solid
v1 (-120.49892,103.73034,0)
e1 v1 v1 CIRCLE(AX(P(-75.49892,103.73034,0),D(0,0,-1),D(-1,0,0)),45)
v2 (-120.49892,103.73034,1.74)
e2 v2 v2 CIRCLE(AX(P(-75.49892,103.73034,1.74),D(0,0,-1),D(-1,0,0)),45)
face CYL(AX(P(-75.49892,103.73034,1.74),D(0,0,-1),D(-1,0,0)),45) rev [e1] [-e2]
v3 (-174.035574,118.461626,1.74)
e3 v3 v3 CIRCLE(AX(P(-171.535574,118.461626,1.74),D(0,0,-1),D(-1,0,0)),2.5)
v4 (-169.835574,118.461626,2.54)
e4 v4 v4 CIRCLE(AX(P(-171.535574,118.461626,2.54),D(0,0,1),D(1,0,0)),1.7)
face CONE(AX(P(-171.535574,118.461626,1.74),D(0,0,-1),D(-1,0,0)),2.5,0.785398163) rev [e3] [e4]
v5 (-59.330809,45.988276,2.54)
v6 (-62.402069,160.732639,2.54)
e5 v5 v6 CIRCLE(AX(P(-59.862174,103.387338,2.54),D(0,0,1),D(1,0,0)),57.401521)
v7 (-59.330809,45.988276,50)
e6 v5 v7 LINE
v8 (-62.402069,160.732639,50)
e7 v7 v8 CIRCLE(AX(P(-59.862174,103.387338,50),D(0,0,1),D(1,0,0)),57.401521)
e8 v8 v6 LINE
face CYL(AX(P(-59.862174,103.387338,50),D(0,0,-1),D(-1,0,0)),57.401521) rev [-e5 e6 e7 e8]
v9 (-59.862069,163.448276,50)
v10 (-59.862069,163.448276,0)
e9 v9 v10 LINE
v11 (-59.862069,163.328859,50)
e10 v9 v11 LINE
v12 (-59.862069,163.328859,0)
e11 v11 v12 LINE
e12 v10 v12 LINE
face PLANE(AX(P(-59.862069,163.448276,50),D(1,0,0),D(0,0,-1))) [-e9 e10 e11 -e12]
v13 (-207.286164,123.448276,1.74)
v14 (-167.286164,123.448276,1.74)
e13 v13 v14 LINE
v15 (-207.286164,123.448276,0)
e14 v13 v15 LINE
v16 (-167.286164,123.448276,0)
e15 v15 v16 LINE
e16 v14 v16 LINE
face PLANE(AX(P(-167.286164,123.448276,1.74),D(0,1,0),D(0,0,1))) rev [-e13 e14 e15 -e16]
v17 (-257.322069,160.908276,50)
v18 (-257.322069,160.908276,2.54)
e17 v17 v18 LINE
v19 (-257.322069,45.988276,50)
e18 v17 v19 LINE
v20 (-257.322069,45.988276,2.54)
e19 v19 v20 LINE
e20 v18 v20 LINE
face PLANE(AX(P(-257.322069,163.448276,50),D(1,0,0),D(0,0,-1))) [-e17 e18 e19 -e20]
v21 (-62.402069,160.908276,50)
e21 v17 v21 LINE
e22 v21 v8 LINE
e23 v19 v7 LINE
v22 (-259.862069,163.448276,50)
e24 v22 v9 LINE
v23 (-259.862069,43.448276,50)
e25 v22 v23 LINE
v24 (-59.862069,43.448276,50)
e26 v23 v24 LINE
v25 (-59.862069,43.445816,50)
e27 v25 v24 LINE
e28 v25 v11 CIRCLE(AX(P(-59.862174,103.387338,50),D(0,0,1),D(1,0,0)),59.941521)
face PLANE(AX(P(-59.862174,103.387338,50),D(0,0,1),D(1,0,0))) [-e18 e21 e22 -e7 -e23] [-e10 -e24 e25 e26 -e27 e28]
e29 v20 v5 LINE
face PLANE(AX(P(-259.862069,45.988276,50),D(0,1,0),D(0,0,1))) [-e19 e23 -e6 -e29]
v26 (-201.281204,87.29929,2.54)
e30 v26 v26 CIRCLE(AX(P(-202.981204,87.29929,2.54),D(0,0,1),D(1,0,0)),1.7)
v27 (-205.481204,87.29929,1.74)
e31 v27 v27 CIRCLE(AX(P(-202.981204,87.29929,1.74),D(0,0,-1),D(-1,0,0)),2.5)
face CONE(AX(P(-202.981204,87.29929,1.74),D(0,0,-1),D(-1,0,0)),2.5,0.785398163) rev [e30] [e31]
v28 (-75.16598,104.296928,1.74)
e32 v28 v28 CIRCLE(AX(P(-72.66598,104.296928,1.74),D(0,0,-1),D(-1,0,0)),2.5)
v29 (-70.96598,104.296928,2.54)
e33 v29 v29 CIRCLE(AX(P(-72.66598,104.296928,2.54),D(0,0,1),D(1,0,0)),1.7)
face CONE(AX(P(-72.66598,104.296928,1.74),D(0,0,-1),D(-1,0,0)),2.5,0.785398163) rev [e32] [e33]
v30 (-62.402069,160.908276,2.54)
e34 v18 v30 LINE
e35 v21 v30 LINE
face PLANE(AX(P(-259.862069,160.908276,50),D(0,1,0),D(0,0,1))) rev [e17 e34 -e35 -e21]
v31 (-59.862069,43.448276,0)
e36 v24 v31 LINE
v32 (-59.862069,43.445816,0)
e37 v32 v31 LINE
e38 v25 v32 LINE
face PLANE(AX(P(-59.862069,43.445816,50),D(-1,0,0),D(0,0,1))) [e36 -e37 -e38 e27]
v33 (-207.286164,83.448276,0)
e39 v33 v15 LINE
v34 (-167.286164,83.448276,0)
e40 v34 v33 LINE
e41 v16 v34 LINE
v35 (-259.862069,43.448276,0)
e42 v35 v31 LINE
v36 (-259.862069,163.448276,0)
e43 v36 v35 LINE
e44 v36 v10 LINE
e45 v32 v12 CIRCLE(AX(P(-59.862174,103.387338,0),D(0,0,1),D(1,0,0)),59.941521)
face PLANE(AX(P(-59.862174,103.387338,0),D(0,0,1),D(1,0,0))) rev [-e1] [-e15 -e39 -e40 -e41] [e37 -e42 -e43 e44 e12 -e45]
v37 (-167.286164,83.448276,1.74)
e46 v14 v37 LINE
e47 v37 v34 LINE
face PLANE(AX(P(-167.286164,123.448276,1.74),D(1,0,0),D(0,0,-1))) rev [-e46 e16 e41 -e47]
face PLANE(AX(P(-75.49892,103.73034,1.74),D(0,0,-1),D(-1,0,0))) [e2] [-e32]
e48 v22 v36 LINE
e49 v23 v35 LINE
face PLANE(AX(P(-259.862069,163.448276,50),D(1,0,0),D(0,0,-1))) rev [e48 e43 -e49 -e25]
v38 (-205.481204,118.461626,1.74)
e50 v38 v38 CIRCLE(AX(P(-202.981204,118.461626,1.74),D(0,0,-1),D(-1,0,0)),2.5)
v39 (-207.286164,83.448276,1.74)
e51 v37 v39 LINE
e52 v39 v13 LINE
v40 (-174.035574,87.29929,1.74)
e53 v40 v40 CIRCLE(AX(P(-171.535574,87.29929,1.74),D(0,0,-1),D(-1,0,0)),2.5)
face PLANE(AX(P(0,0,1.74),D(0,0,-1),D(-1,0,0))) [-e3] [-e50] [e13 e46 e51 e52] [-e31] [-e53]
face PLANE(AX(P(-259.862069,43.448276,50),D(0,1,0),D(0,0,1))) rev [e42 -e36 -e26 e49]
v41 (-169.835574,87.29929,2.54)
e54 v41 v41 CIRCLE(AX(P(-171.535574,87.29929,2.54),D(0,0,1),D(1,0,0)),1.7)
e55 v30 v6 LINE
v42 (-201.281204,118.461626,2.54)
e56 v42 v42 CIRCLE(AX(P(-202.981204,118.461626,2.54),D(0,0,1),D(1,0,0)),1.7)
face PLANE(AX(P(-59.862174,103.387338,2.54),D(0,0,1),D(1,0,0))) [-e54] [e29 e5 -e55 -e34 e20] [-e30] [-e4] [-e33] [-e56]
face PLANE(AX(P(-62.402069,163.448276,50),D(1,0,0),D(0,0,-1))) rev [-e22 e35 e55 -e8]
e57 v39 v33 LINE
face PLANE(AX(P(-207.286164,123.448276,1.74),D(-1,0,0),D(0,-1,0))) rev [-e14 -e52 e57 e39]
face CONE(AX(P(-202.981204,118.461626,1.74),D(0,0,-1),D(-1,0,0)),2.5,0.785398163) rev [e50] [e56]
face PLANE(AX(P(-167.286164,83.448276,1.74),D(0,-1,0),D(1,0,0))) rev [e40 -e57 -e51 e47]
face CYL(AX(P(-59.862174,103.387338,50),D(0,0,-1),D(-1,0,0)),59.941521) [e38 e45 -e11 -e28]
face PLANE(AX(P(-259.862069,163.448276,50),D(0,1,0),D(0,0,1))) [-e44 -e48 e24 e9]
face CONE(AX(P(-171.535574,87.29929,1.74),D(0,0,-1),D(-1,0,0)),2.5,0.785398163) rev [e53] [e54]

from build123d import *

# Parameters (mm, degrees)
BOSS_EXTRUDE1_DEPTH            = 50
SHELL1_START                   = 2.54
SHELL1_DEPTH                   = 47.46
SKETCH3_R                      = 45
CUT_EXTRUDE1_DEPTH             = 1.74
SKETCH4_W                      = 40
SKETCH4_H                      = 40
CUT_EXTRUDE2_DEPTH             = 1.74
F_1_0MM_DOWEL_HOLE1_AT_2_COUNT = 2
F_1_0MM_DOWEL_HOLE1_AT_2_PITCH = 99.87910309
F_1_0MM_DOWEL_HOLE1_AT_3_COUNT = 2
F_1_0MM_DOWEL_HOLE1_AT_3_PITCH = 131.082783866
F_1_0MM_DOWEL_HOLE1_AT_4_COUNT = 2
F_1_0MM_DOWEL_HOLE1_AT_4_PITCH = 131.419090104
F_1_0MM_DOWEL_HOLE1_AT_5_COUNT = 2
F_1_0MM_DOWEL_HOLE1_AT_5_PITCH = 100.320069037


# Read off the part's stored shape, not the designer's step: Shell1
with BuildPart() as part:
    # Sketch2 → Boss-Extrude1 (new body)
    with BuildSketch(Plane.XY):
        with BuildLine():
            Line((-59.862068966, 43.445816391), (-59.862068966, 43.448275862))
            Line((-59.862068966, 43.448275862), (-259.862068966, 43.448275862))
            Line((-259.862068966, 43.448275862), (-259.862068966, 163.448275862))
            Line((-259.862068966, 163.448275862), (-59.862068966, 163.448275862))
            Line((-59.862068966, 163.448275862), (-59.862068966, 163.328859089))
            ThreePointArc((-59.862068966, 163.328859089), (0.079347122, 103.38733774), (-59.862068966, 43.445816391))
        make_face()
    extrude(amount=BOSS_EXTRUDE1_DEPTH)

    # Shell1 outline → Shell1 (cut)
    with BuildSketch(Plane.XY.offset(SHELL1_START)):
        with BuildLine():
            Line((-257.322068966, 160.908275862), (-257.322068966, 45.988275862))
            Line((-257.322068966, 45.988275862), (-59.330809241, 45.988275862))
            ThreePointArc((-59.330809241, 45.988275862), (-2.481203762, 104.923202846), (-62.402068966, 160.732639099))
            Line((-62.402068966, 160.732639099), (-62.402068966, 160.908275862))
            Line((-62.402068966, 160.908275862), (-257.322068966, 160.908275862))
        make_face()
    extrude(amount=SHELL1_DEPTH, mode=Mode.SUBTRACT)

    # Sketch3 → Cut-Extrude1 (cut)
    with BuildSketch(Plane(origin=(0, 0, 0), x_dir=(-1, 0, 0), z_dir=(0, 0, -1))):
        with Locations((75.49891969, 103.730340091)):
            Circle(SKETCH3_R)
    extrude(amount=-CUT_EXTRUDE1_DEPTH, mode=Mode.SUBTRACT)

    # Sketch4 → Cut-Extrude2 (cut)
    with BuildSketch(Plane(origin=(0, 0, 0), x_dir=(-1, 0, 0), z_dir=(0, 0, -1))):
        with Locations((187.286164269, 103.448275862)):
            Rectangle(SKETCH4_W, SKETCH4_H)
    extrude(amount=-CUT_EXTRUDE2_DEPTH, mode=Mode.SUBTRACT)

    # Sketch8 → Ø1.0mm Dowel Hole1 (revolve, cut)
    with BuildSketch(Plane(origin=(-72.665980043, 104.296928021, 1.74), x_dir=(0, 1, 0), z_dir=(1, 0, 0))):
        Polygon((0, 0), (0, 1.57043031), (0.5, 1.27), (0.5, 2), (2.5, 0), align=None)
    f_1_0mm_dowel_hole1 = revolve(axis=Axis((-72.665980043, 104.296928021, -4.61), (0, 0, 1)), mode=Mode.SUBTRACT)

    # Ø1.0mm Dowel Hole1 at 2: Ø1.0mm Dowel Hole1 ×2
    with Locations(*[Vector(-0.9898926866452568, 0.1418184364821284, 0) * (i * F_1_0MM_DOWEL_HOLE1_AT_2_PITCH) for i in range(1, F_1_0MM_DOWEL_HOLE1_AT_2_COUNT)]):
        add(f_1_0mm_dowel_hole1, mode=Mode.SUBTRACT)

    # Ø1.0mm Dowel Hole1 at 3: Ø1.0mm Dowel Hole1 ×2
    with Locations(*[Vector(-0.9941444630694566, 0.10805918076841914, 0) * (i * F_1_0MM_DOWEL_HOLE1_AT_3_PITCH) for i in range(1, F_1_0MM_DOWEL_HOLE1_AT_3_COUNT)]):
        add(f_1_0mm_dowel_hole1, mode=Mode.SUBTRACT)

    # Ø1.0mm Dowel Hole1 at 4: Ø1.0mm Dowel Hole1 ×2
    with Locations(*[Vector(-0.9916004111862218, -0.12933918406776793, 0) * (i * F_1_0MM_DOWEL_HOLE1_AT_4_PITCH) for i in range(1, F_1_0MM_DOWEL_HOLE1_AT_4_COUNT)]):
        add(f_1_0mm_dowel_hole1, mode=Mode.SUBTRACT)

    # Ø1.0mm Dowel Hole1 at 5: Ø1.0mm Dowel Hole1 ×2
    with Locations(*[Vector(-0.9855415237113911, -0.16943407284436512, 0) * (i * F_1_0MM_DOWEL_HOLE1_AT_5_PITCH) for i in range(1, F_1_0MM_DOWEL_HOLE1_AT_5_COUNT)]):
        add(f_1_0mm_dowel_hole1, mode=Mode.SUBTRACT)


solid = part.part
